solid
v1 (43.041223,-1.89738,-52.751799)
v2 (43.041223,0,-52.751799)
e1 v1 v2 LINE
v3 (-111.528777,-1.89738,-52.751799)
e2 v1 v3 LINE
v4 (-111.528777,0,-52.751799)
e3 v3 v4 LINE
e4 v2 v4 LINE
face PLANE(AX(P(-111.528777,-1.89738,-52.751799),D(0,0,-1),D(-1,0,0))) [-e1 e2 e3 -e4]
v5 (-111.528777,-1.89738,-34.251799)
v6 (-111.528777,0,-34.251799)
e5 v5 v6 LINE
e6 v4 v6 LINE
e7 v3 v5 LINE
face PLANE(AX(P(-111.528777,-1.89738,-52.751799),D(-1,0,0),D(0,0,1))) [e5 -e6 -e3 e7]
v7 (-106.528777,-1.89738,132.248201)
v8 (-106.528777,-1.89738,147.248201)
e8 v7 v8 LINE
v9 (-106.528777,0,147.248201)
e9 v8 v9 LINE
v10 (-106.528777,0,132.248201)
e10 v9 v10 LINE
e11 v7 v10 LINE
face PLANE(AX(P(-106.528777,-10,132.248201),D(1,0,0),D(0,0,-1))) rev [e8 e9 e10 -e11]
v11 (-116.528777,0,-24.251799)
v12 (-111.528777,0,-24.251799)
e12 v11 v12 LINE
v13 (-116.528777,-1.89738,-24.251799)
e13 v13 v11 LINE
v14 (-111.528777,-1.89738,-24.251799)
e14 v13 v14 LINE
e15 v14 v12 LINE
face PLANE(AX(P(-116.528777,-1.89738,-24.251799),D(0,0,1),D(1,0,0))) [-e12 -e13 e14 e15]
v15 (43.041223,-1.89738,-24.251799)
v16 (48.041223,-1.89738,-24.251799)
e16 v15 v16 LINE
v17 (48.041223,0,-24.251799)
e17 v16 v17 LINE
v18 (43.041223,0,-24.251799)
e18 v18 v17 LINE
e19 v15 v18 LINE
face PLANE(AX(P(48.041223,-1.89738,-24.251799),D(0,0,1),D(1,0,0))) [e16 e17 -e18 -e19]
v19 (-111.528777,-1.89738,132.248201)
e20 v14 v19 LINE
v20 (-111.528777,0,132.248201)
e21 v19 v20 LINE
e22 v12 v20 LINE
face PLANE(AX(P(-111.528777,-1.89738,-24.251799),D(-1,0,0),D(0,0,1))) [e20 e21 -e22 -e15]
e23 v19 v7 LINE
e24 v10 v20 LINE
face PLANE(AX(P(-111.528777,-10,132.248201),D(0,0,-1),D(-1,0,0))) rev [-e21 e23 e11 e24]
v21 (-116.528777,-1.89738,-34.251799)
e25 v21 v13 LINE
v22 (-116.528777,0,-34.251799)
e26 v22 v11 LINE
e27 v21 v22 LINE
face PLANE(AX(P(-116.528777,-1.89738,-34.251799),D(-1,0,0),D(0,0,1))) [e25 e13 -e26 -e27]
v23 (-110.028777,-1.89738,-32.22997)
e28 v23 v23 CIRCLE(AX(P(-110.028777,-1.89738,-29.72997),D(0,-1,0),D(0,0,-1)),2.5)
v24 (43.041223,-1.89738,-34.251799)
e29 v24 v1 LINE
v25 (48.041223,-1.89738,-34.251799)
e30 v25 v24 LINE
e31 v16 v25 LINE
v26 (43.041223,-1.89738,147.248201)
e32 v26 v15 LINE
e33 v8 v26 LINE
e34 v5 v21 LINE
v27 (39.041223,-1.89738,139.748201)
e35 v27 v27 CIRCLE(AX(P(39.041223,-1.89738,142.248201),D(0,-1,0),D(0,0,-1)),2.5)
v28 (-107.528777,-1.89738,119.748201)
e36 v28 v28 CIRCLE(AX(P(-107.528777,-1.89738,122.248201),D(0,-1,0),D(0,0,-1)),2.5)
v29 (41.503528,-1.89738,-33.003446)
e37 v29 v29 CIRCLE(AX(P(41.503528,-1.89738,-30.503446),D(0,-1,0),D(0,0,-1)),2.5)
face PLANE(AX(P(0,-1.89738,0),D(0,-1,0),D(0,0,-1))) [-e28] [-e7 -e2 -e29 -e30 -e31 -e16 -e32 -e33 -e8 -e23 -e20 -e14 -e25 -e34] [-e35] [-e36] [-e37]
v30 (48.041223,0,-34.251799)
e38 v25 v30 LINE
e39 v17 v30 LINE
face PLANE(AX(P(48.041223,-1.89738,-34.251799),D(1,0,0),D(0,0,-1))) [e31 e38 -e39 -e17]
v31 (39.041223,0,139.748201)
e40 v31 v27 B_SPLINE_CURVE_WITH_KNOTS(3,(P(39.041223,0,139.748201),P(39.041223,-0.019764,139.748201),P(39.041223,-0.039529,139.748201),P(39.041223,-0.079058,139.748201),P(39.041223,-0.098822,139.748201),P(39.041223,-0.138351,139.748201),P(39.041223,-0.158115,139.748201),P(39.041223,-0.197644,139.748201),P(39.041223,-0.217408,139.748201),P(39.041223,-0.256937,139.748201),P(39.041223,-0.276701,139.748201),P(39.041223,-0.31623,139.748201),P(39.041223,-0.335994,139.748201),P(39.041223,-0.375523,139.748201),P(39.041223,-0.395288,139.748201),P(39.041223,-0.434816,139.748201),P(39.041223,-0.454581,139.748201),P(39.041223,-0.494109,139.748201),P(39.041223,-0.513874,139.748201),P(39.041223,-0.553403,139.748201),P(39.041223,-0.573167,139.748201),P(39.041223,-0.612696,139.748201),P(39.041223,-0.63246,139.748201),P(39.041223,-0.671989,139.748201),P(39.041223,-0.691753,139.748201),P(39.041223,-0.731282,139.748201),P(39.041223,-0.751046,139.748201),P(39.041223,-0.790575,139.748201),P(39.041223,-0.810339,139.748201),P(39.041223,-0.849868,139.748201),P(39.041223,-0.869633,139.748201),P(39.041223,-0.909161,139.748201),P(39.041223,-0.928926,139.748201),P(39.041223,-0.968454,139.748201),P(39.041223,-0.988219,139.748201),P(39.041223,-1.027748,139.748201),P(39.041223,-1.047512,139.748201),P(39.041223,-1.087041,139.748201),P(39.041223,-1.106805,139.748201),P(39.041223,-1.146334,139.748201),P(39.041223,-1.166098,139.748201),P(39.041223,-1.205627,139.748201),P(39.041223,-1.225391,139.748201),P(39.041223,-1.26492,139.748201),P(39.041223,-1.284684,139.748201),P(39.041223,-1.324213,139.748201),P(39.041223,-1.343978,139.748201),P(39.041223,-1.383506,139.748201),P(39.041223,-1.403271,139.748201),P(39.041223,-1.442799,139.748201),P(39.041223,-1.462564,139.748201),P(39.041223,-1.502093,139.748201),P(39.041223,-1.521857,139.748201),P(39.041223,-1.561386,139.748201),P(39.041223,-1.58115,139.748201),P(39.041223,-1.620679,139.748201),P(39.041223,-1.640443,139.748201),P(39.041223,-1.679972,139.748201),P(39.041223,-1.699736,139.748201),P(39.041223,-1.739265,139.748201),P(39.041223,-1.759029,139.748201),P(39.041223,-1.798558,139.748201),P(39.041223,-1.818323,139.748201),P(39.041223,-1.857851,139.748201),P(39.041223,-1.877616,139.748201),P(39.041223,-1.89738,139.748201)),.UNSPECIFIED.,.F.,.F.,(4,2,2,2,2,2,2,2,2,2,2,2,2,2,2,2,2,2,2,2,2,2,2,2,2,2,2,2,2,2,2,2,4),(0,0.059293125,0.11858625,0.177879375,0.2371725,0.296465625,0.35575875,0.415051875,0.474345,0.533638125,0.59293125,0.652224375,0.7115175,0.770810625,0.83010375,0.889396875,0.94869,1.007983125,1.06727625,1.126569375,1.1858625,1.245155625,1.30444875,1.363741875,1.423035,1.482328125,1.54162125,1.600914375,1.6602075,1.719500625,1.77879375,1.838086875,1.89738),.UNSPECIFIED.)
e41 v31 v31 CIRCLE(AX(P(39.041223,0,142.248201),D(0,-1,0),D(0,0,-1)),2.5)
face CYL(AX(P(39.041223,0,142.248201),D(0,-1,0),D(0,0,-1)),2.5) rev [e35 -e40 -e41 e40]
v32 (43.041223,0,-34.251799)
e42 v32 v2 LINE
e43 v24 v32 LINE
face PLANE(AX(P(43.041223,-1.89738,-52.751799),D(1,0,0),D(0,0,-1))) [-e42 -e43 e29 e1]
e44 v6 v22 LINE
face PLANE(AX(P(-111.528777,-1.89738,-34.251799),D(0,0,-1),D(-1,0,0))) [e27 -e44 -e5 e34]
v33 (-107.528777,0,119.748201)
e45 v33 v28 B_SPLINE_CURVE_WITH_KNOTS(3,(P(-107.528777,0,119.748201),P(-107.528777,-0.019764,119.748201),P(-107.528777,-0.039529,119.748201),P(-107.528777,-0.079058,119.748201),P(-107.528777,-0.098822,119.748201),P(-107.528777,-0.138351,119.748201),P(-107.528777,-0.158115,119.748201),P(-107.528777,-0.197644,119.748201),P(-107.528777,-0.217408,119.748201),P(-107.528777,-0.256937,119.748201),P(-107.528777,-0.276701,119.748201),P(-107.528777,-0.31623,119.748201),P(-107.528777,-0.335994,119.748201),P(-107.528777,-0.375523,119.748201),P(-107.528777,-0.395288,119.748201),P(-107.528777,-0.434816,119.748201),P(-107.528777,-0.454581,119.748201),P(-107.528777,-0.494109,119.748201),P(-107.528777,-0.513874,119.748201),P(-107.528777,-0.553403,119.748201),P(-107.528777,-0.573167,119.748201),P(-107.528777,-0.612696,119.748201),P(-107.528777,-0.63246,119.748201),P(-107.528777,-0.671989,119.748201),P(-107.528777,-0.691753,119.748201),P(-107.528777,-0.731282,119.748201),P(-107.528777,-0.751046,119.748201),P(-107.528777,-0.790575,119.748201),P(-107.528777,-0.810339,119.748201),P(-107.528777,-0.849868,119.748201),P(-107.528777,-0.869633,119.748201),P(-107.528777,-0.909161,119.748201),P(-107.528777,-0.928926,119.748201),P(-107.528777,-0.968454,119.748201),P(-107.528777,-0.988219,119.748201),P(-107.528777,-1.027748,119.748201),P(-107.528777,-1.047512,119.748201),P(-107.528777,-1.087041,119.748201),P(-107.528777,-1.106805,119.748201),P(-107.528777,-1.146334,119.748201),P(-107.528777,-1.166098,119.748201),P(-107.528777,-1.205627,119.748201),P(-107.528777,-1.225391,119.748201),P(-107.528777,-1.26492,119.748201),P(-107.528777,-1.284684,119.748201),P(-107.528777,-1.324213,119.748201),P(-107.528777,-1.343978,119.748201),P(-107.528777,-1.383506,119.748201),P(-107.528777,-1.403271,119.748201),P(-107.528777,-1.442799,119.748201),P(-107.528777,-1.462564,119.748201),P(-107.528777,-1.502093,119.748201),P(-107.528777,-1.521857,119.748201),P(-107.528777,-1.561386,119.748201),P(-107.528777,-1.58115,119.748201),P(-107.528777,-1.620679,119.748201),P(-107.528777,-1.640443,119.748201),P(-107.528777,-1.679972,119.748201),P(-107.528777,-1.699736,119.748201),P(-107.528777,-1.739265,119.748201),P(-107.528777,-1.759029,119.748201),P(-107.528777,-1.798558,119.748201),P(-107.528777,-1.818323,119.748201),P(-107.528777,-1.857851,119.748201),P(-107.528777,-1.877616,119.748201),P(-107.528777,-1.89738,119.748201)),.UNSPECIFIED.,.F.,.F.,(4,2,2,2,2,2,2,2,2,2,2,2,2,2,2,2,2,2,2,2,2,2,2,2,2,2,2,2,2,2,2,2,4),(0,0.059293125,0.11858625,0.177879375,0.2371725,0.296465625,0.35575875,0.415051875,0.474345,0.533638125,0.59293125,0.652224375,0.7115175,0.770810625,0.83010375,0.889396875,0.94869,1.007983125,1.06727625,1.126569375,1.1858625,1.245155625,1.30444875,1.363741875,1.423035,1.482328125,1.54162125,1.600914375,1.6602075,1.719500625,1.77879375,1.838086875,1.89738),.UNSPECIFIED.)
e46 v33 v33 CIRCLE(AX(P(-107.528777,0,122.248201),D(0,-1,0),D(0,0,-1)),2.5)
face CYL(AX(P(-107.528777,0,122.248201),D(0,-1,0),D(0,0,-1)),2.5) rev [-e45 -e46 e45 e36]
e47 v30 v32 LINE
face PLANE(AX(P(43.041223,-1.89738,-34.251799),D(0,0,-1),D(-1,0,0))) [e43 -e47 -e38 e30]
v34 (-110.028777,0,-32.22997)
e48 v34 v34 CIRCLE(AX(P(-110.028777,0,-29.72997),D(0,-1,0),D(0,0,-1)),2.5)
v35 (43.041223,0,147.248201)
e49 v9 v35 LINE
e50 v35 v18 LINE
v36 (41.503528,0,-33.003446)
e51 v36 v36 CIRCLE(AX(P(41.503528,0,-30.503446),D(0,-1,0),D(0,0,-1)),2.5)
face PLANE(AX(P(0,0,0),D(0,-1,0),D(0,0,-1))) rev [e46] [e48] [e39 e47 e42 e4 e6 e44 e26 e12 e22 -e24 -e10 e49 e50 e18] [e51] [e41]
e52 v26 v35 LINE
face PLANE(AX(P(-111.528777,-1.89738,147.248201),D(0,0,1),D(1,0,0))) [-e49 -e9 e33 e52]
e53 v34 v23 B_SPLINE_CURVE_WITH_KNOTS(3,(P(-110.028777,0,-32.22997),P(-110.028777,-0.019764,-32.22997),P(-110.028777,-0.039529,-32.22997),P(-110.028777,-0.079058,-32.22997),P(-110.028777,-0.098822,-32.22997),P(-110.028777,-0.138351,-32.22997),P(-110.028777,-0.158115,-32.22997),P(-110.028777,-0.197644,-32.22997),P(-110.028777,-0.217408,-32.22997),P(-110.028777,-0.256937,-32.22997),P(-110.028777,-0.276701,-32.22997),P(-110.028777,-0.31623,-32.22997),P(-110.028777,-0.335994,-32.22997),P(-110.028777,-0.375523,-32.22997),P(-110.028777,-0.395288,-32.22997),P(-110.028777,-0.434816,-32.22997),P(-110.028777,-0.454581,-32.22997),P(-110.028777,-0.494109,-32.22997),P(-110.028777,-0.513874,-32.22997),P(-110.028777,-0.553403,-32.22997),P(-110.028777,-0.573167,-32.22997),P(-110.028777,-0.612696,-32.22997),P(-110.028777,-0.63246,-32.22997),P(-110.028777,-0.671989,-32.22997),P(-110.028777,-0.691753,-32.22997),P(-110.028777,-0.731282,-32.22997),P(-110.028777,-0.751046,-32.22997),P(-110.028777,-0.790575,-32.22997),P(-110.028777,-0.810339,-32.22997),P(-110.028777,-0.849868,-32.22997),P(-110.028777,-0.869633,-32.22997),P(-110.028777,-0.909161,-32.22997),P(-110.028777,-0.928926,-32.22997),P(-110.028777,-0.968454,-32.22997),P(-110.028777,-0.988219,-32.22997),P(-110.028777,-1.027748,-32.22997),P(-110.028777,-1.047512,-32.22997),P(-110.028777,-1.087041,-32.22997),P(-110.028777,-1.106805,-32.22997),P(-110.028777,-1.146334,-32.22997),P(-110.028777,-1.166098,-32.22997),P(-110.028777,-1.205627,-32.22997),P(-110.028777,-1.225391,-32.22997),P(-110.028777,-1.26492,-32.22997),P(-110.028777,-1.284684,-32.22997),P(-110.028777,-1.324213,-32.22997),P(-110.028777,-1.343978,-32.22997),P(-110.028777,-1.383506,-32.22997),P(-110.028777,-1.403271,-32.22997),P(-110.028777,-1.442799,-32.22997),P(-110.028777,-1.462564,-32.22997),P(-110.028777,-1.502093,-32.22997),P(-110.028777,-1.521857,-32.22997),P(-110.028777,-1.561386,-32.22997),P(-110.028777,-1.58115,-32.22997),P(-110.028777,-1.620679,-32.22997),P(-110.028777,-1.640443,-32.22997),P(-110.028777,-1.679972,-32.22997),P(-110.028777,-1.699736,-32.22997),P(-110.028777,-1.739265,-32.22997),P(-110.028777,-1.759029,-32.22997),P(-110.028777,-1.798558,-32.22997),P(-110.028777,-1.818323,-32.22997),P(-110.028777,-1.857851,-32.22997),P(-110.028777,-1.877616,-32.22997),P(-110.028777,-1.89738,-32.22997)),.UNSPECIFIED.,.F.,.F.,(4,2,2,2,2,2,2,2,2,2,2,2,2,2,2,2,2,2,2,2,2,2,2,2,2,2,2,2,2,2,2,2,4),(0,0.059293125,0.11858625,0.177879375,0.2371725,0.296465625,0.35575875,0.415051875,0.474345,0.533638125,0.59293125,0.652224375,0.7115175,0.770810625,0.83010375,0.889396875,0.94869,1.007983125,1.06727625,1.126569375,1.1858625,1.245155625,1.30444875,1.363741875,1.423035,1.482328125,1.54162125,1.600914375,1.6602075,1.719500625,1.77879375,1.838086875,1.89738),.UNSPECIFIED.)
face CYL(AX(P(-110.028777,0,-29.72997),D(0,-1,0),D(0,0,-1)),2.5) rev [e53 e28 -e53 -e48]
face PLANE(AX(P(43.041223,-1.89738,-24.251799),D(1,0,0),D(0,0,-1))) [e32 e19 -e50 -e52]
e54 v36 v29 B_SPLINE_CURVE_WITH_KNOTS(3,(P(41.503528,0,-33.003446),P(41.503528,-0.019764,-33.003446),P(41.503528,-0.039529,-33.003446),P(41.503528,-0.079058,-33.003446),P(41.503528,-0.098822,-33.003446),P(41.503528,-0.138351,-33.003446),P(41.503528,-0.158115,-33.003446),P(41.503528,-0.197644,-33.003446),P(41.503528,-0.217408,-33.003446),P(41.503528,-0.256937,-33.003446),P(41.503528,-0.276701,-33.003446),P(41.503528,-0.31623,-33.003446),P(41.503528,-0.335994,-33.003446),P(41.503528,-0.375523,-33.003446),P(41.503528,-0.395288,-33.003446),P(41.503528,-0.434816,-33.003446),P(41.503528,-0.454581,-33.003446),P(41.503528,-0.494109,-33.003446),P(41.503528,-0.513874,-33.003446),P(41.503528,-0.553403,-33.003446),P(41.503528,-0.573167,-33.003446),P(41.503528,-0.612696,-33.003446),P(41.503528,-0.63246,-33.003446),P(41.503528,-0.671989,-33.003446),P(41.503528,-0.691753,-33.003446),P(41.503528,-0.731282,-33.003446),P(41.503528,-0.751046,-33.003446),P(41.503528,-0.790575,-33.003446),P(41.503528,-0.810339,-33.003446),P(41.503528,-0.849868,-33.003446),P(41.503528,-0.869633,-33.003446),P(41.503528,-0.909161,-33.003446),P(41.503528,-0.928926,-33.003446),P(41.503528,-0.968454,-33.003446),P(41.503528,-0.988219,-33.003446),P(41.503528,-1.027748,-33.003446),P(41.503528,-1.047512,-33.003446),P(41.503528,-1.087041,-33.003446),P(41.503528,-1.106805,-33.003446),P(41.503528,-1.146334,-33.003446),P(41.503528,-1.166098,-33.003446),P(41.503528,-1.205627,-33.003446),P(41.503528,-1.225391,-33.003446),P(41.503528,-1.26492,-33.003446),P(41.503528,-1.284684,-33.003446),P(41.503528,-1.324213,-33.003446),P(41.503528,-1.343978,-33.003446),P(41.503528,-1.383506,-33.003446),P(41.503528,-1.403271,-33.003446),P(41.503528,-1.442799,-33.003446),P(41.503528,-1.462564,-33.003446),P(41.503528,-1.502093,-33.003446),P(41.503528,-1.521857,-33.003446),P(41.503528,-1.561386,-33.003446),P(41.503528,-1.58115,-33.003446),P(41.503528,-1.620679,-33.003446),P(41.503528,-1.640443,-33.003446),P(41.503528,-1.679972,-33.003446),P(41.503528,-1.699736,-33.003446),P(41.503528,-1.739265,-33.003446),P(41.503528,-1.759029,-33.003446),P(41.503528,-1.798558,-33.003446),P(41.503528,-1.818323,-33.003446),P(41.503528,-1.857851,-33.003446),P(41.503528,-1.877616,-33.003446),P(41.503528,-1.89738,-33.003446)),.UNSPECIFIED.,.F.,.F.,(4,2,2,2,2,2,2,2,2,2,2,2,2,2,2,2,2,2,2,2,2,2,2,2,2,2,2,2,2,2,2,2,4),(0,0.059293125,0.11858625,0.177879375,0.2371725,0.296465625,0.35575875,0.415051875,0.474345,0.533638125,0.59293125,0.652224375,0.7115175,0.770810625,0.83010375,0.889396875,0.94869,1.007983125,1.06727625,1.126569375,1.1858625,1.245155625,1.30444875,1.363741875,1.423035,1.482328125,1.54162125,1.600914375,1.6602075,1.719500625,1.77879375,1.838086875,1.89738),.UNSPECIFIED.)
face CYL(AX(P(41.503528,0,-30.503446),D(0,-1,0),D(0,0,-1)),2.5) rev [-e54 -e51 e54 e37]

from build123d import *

# Parameters (mm, degrees)
BASE_FLANGE1_DEPTH = 1.89738
SKETCH6_R          = 2.5
CUT_EXTRUDE1_DEPTH = 1.89738
SKETCH7_W          = 5
SKETCH7_H          = 15
CUT_EXTRUDE2_DEPTH = 10


# Sheet-metal steps are written as plain solids
with BuildPart() as part:
    # Sketch1 → Base-Flange1 (new body)
    with BuildSketch(Plane(origin=(0, 0, 0), x_dir=(1, 0, 0), z_dir=(0, 1, 0))):
        Polygon((43.041223022, 34.251798561), (48.041223022, 34.251798561), (48.041223022, 24.251798561), (43.041223022, 24.251798561), (43.041223022, -147.248201439), (-111.528776978, -147.248201439), (-111.528776978, 24.251798561), (-116.528776978, 24.251798561), (-116.528776978, 34.251798561), (-111.528776978, 34.251798561), (-111.528776978, 52.751798561), (43.041223022, 52.751798561), align=None)
    extrude(amount=-BASE_FLANGE1_DEPTH)

    # Sketch6 → Cut-Extrude1 (cut)
    with BuildSketch(Plane.XZ.offset(1.89738)):
        with Locations(Location((-107.528776978, 122.248201439, 0), (0, 0, 270))):
            Circle(SKETCH6_R)
        with Locations(Location((39.041223022, 142.248201439, 0), (0, 0, 270))):
            Circle(SKETCH6_R)
        with Locations(Location((-110.028776978, -29.729970338, 0), (0, 0, 270))):
            Circle(SKETCH6_R)
        with Locations(Location((41.503528065, -30.503445529, 0), (0, 0, 270))):
            Circle(SKETCH6_R)
    extrude(amount=-CUT_EXTRUDE1_DEPTH, mode=Mode.SUBTRACT)

    # Sketch7 → Cut-Extrude2 (cut)
    with BuildSketch(Plane(origin=(0, 0, 0), x_dir=(1, 0, 0), z_dir=(0, 1, 0))):
        with Locations((-109.028776978, -139.748201439)):
            Rectangle(SKETCH7_W, SKETCH7_H)
    extrude(amount=-CUT_EXTRUDE2_DEPTH, mode=Mode.SUBTRACT)


solid = part.part
